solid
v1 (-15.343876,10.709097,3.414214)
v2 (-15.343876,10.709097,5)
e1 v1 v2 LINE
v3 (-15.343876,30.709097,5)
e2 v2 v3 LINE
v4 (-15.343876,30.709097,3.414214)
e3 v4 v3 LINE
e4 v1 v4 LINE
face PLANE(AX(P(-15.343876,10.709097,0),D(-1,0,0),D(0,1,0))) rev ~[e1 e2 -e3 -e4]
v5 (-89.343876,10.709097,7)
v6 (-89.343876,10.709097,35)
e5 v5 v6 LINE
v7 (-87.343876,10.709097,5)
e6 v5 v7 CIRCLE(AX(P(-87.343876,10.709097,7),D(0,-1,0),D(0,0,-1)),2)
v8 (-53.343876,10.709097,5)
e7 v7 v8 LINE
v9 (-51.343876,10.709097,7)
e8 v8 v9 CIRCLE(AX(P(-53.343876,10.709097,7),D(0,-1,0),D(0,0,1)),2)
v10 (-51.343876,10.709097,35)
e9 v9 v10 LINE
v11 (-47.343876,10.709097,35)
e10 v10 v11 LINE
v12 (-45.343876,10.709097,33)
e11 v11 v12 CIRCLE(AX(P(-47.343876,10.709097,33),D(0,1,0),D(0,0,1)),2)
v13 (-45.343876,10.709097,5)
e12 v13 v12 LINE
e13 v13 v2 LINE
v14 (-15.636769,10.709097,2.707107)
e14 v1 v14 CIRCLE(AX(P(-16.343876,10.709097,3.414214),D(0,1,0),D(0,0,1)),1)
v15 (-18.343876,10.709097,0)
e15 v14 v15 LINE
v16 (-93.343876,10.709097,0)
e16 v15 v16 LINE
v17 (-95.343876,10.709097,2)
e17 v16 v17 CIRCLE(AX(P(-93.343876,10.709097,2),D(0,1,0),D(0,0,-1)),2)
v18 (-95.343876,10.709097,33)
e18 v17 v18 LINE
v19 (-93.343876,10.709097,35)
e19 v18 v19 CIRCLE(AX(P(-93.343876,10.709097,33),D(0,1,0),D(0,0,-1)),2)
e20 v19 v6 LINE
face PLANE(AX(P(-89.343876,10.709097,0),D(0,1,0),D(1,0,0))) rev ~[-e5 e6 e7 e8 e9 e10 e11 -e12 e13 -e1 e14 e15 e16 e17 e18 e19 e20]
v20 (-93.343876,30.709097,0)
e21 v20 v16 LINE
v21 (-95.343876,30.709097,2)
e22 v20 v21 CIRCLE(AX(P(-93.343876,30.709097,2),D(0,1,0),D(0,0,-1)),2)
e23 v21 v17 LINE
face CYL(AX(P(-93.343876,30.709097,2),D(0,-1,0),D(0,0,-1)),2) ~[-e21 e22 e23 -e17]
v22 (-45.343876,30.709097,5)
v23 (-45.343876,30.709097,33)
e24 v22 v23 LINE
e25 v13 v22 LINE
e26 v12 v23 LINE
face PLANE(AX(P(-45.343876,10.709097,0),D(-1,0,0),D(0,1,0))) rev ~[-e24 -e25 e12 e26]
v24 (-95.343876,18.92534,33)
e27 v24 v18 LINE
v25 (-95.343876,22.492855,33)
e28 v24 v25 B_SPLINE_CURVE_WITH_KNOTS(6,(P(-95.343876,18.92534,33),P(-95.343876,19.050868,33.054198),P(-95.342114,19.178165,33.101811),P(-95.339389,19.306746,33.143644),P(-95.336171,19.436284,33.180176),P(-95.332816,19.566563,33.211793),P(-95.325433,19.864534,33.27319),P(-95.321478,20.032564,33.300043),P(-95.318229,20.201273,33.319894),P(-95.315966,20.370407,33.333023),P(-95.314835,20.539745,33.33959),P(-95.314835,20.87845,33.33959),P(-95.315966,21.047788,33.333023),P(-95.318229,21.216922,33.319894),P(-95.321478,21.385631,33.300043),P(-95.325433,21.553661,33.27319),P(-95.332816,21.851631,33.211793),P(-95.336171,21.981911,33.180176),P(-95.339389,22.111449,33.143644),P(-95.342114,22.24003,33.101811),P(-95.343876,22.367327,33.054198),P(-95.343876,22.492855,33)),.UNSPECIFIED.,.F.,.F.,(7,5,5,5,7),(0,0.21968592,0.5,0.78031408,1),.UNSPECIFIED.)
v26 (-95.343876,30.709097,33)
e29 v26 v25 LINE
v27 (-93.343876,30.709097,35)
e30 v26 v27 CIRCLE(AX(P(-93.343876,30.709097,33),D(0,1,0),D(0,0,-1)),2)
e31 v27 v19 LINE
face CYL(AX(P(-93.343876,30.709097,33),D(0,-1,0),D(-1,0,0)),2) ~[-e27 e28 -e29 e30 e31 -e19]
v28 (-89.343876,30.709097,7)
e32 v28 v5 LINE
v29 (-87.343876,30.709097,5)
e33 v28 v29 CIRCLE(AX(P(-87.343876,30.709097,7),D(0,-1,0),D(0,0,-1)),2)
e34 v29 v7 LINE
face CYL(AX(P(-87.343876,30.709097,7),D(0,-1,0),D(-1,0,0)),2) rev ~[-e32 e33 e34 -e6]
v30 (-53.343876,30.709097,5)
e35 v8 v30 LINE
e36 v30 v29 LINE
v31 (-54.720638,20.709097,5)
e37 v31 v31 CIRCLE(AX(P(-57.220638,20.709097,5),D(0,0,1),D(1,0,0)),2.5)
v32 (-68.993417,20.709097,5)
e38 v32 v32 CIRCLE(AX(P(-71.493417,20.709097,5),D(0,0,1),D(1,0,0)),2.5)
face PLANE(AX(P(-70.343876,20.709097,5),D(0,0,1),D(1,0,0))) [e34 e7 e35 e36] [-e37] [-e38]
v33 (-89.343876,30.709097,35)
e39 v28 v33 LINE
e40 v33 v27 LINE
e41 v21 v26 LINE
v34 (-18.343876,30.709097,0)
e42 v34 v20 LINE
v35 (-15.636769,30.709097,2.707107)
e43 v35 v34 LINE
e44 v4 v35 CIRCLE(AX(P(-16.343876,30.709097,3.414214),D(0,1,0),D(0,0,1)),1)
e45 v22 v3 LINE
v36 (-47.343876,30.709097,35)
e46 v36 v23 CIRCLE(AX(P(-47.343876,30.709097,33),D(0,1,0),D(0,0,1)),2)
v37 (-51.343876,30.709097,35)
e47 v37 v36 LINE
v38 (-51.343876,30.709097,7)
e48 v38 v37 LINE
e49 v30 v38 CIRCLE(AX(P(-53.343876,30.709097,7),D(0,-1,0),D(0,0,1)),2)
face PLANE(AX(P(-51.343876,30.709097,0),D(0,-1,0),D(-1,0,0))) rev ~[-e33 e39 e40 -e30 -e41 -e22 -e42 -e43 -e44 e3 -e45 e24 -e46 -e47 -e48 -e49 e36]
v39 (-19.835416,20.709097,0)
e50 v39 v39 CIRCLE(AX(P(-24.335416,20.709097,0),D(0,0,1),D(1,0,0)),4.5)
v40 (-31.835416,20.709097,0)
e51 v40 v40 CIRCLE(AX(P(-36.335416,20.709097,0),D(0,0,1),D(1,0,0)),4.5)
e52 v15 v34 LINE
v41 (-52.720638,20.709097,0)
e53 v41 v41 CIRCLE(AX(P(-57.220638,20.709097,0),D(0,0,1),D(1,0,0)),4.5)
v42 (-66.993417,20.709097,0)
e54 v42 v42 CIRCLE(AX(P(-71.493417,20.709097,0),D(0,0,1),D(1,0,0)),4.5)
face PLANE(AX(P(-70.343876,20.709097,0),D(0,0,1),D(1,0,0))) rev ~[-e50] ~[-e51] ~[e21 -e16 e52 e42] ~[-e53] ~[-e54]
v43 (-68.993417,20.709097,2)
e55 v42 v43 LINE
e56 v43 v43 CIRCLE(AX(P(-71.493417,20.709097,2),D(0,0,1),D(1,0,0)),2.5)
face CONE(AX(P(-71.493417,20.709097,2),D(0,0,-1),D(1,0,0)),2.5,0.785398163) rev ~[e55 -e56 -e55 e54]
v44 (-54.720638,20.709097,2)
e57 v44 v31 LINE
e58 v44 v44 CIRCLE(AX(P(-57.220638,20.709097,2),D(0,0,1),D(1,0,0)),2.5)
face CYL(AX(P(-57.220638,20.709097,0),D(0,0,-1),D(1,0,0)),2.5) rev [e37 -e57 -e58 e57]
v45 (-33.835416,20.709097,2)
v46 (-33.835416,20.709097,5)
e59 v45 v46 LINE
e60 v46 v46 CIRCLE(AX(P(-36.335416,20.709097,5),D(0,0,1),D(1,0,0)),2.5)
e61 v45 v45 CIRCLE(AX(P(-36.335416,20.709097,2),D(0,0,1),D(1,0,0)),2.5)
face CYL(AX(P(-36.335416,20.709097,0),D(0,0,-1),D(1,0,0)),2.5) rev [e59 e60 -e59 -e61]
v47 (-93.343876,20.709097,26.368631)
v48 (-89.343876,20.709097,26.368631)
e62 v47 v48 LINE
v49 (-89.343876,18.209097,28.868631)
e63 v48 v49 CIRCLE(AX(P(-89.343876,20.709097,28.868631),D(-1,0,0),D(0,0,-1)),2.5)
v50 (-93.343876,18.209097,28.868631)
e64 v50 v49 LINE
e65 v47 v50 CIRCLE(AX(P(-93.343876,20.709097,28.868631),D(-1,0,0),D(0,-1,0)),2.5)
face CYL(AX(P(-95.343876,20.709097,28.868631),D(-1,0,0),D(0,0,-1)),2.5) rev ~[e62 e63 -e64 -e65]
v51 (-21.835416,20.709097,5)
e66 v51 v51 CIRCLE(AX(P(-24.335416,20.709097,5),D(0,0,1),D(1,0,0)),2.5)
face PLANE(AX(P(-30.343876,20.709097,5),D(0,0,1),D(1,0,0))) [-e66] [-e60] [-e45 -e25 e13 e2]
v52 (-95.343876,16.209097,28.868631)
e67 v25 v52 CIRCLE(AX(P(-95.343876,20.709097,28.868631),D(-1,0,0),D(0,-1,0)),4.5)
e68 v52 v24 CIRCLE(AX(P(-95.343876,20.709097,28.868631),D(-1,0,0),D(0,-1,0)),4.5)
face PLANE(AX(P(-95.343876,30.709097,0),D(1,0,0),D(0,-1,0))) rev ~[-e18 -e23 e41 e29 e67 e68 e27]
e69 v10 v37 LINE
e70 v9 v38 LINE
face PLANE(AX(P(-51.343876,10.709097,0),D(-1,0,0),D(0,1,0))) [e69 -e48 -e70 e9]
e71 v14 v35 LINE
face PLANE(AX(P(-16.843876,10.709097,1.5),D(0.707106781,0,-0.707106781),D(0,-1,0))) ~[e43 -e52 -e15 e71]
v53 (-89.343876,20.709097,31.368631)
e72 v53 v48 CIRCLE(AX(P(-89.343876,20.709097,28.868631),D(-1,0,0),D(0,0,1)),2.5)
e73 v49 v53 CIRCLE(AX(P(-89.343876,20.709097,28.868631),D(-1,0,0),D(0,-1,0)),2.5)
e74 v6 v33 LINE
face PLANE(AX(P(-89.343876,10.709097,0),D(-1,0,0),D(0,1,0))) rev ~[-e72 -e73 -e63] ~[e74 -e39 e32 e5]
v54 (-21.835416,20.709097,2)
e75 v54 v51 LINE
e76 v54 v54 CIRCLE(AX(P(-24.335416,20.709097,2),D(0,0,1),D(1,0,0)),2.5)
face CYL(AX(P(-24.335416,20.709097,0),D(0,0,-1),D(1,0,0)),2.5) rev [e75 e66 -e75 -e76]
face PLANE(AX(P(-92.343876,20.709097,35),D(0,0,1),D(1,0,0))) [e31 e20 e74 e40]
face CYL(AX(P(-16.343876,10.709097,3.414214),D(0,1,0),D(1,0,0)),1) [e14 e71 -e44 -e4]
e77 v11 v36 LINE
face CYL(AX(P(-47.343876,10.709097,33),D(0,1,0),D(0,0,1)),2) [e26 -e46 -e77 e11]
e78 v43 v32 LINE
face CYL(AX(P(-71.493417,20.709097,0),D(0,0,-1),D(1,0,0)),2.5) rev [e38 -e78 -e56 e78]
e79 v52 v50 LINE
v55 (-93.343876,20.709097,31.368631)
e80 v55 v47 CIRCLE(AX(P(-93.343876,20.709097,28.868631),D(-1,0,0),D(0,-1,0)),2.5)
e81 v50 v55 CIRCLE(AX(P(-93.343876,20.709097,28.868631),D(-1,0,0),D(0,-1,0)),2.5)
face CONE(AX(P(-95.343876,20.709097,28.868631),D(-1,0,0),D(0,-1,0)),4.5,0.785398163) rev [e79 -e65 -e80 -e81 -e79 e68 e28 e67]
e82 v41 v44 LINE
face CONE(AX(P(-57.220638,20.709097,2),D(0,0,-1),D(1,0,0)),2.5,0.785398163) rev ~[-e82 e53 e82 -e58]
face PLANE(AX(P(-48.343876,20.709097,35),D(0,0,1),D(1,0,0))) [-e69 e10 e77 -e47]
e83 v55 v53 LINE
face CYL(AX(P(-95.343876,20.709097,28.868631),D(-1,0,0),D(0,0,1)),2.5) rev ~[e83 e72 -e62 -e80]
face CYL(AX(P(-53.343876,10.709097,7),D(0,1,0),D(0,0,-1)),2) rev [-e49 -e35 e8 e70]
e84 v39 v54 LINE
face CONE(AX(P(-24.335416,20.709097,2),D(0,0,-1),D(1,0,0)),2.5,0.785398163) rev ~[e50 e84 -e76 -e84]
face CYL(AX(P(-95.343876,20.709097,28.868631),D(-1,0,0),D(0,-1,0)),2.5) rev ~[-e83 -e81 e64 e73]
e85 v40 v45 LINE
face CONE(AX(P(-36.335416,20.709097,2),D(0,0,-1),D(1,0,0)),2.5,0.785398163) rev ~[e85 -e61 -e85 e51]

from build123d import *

# Parameters (mm, degrees)
F1_DEPTH = 35
F0_W     = 6
F0_H     = 20
F0_R     = 2.5
F0_W_2   = 30
F2_DEPTH = 5
F3_R     = 2
F4_SIZE  = 3
F5_R     = 1
F6_SIZE  = 2
F7_R     = 2
F9_DEPTH = 12.5


# Not quite as in the source:
# - a fillet or chamfer that OpenCascade refuses, or shapes differently, is made with other operations: its cross-section is extruded or revolved along the edge and cut away or added
# - a feature names something its author has since deleted; it is built from what else it names


with BuildPart() as f1:
    # F0 (on Top) → F1 (new body)
    with BuildSketch(Plane.XY):
        Polygon((-89.3438757165, 20.7090974661), (-89.3438757165, 30.7090974661), (-95.3438757165, 30.7090974661), (-95.3438757165, 10.7090974661), (-89.3438757165, 10.7090974661), align=None)
    extrude(amount=F1_DEPTH)



with BuildPart() as f1b:
    # F0 (on Top) → F1, piece 2 (new body)
    with BuildSketch(Plane.XY):
        with Locations((-48.3438757165, 20.7090974661)):
            Rectangle(F0_W, F0_H)
    extrude(amount=F1_DEPTH)


with BuildPart() as f1_1:
    add(f1.part)

    add(f1b.part)  # F2 merges F1b
    # F0 (on Top) → F2 (join)
    with BuildSketch(Plane.XY):
        Polygon((-51.3438757165, 30.7090974661), (-89.3438757165, 30.7090974661), (-89.3438757165, 20.7090974661), (-89.3438757165, 10.7090974661), (-51.3438757165, 10.7090974661), align=None)
        with Locations((-71.4934170246, 20.7090974661)):
            Circle(F0_R, mode=Mode.SUBTRACT)
        with Locations((-57.2206377983, 20.7090974661)):
            Circle(F0_R, mode=Mode.SUBTRACT)
        with Locations((-30.3438757165, 20.7090974661)):
            Rectangle(F0_W_2, F0_H)
        with Locations((-36.3354164958, 20.7090974661)):
            Circle(F0_R, mode=Mode.SUBTRACT)
        with Locations((-24.3354164958, 20.7090974661)):
            Circle(F0_R, mode=Mode.SUBTRACT)
    extrude(amount=F2_DEPTH)

    # F3
    f3_edges = [f1_1.edges().sort_by_distance(p)[0] for p in [
        (-89.343876, 20.709097, 5),
        (-51.343876, 20.709097, 5),
        (-45.343876, 20.709097, 35),
    ]]
    fillet(f3_edges, radius=F3_R)

    # F4
    f4_edges = [f1_1.edges().sort_by_distance(p)[0] for p in [
        (-15.343876, 20.709097, 0),
    ]]
    chamfer(f4_edges, length=F4_SIZE)

    # F5
    f5_edges = [f1_1.edges().sort_by_distance(p)[0] for p in [
        (-15.343876, 20.709097, 3),
    ]]
    fillet(f5_edges, radius=F5_R)

    # F6
    f6_edges = [f1_1.edges().sort_by_distance(p)[0] for p in [
        (-59.720638, 20.709097, 0),
        (-38.835416, 20.709097, 0),
        (-26.835416, 20.709097, 0),
        (-73.993417, 20.709097, 0),
    ]]
    chamfer(f6_edges, length=F6_SIZE)

    # F7
    f7_edges = [f1_1.edges().sort_by_distance(p)[0] for p in [
        (-95.343876, 20.709097, 35),
        (-95.343876, 20.709097, 0),
    ]]
    fillet(f7_edges, radius=F7_R)

    # F8 (on face) → F9 (cut, symmetric)
    with BuildSketch(Plane(origin=(-95.3438757165, 0, 0), x_dir=(0, -1, 0), z_dir=(-1, 0, 0))):
        with BuildLine():
            ThreePointArc((-18.2090974661, 28.8686309451), (-18.9413305132, 30.636397898), (-20.7090974661, 31.3686309451))
            Line((-20.7090974661, 31.3686309451), (-20.7090974661, 26.3686309451))
            ThreePointArc((-20.7090974661, 26.3686309451), (-18.9413305132, 27.1008639921), (-18.2090974661, 28.8686309451))
        make_face()
        with BuildLine():
            Line((-20.7090974661, 26.3686309451), (-20.7090974661, 31.3686309451))
            ThreePointArc((-20.7090974661, 31.3686309451), (-23.2090974661, 28.8686309451), (-20.7090974661, 26.3686309451))
        make_face()
    extrude(amount=F9_DEPTH, both=True, mode=Mode.SUBTRACT)

    # F10: chamfer of 2 on 1 edges, made by hand

    # F10_s1 → F10_t2 (revolve, cut)
    with BuildSketch(Plane.XY.offset(28.8686309451)):
        Polygon((-95.3438757165, 16.2090974661), (-93.3438757165, 18.2090974661), (-95.3438757165, 18.2090974661), align=None)
    revolve(axis=Axis((-95.3438757165, 20.7090974661, 28.8686309451), (-1, 0, 0)), mode=Mode.SUBTRACT)


solid = f1_1.part
